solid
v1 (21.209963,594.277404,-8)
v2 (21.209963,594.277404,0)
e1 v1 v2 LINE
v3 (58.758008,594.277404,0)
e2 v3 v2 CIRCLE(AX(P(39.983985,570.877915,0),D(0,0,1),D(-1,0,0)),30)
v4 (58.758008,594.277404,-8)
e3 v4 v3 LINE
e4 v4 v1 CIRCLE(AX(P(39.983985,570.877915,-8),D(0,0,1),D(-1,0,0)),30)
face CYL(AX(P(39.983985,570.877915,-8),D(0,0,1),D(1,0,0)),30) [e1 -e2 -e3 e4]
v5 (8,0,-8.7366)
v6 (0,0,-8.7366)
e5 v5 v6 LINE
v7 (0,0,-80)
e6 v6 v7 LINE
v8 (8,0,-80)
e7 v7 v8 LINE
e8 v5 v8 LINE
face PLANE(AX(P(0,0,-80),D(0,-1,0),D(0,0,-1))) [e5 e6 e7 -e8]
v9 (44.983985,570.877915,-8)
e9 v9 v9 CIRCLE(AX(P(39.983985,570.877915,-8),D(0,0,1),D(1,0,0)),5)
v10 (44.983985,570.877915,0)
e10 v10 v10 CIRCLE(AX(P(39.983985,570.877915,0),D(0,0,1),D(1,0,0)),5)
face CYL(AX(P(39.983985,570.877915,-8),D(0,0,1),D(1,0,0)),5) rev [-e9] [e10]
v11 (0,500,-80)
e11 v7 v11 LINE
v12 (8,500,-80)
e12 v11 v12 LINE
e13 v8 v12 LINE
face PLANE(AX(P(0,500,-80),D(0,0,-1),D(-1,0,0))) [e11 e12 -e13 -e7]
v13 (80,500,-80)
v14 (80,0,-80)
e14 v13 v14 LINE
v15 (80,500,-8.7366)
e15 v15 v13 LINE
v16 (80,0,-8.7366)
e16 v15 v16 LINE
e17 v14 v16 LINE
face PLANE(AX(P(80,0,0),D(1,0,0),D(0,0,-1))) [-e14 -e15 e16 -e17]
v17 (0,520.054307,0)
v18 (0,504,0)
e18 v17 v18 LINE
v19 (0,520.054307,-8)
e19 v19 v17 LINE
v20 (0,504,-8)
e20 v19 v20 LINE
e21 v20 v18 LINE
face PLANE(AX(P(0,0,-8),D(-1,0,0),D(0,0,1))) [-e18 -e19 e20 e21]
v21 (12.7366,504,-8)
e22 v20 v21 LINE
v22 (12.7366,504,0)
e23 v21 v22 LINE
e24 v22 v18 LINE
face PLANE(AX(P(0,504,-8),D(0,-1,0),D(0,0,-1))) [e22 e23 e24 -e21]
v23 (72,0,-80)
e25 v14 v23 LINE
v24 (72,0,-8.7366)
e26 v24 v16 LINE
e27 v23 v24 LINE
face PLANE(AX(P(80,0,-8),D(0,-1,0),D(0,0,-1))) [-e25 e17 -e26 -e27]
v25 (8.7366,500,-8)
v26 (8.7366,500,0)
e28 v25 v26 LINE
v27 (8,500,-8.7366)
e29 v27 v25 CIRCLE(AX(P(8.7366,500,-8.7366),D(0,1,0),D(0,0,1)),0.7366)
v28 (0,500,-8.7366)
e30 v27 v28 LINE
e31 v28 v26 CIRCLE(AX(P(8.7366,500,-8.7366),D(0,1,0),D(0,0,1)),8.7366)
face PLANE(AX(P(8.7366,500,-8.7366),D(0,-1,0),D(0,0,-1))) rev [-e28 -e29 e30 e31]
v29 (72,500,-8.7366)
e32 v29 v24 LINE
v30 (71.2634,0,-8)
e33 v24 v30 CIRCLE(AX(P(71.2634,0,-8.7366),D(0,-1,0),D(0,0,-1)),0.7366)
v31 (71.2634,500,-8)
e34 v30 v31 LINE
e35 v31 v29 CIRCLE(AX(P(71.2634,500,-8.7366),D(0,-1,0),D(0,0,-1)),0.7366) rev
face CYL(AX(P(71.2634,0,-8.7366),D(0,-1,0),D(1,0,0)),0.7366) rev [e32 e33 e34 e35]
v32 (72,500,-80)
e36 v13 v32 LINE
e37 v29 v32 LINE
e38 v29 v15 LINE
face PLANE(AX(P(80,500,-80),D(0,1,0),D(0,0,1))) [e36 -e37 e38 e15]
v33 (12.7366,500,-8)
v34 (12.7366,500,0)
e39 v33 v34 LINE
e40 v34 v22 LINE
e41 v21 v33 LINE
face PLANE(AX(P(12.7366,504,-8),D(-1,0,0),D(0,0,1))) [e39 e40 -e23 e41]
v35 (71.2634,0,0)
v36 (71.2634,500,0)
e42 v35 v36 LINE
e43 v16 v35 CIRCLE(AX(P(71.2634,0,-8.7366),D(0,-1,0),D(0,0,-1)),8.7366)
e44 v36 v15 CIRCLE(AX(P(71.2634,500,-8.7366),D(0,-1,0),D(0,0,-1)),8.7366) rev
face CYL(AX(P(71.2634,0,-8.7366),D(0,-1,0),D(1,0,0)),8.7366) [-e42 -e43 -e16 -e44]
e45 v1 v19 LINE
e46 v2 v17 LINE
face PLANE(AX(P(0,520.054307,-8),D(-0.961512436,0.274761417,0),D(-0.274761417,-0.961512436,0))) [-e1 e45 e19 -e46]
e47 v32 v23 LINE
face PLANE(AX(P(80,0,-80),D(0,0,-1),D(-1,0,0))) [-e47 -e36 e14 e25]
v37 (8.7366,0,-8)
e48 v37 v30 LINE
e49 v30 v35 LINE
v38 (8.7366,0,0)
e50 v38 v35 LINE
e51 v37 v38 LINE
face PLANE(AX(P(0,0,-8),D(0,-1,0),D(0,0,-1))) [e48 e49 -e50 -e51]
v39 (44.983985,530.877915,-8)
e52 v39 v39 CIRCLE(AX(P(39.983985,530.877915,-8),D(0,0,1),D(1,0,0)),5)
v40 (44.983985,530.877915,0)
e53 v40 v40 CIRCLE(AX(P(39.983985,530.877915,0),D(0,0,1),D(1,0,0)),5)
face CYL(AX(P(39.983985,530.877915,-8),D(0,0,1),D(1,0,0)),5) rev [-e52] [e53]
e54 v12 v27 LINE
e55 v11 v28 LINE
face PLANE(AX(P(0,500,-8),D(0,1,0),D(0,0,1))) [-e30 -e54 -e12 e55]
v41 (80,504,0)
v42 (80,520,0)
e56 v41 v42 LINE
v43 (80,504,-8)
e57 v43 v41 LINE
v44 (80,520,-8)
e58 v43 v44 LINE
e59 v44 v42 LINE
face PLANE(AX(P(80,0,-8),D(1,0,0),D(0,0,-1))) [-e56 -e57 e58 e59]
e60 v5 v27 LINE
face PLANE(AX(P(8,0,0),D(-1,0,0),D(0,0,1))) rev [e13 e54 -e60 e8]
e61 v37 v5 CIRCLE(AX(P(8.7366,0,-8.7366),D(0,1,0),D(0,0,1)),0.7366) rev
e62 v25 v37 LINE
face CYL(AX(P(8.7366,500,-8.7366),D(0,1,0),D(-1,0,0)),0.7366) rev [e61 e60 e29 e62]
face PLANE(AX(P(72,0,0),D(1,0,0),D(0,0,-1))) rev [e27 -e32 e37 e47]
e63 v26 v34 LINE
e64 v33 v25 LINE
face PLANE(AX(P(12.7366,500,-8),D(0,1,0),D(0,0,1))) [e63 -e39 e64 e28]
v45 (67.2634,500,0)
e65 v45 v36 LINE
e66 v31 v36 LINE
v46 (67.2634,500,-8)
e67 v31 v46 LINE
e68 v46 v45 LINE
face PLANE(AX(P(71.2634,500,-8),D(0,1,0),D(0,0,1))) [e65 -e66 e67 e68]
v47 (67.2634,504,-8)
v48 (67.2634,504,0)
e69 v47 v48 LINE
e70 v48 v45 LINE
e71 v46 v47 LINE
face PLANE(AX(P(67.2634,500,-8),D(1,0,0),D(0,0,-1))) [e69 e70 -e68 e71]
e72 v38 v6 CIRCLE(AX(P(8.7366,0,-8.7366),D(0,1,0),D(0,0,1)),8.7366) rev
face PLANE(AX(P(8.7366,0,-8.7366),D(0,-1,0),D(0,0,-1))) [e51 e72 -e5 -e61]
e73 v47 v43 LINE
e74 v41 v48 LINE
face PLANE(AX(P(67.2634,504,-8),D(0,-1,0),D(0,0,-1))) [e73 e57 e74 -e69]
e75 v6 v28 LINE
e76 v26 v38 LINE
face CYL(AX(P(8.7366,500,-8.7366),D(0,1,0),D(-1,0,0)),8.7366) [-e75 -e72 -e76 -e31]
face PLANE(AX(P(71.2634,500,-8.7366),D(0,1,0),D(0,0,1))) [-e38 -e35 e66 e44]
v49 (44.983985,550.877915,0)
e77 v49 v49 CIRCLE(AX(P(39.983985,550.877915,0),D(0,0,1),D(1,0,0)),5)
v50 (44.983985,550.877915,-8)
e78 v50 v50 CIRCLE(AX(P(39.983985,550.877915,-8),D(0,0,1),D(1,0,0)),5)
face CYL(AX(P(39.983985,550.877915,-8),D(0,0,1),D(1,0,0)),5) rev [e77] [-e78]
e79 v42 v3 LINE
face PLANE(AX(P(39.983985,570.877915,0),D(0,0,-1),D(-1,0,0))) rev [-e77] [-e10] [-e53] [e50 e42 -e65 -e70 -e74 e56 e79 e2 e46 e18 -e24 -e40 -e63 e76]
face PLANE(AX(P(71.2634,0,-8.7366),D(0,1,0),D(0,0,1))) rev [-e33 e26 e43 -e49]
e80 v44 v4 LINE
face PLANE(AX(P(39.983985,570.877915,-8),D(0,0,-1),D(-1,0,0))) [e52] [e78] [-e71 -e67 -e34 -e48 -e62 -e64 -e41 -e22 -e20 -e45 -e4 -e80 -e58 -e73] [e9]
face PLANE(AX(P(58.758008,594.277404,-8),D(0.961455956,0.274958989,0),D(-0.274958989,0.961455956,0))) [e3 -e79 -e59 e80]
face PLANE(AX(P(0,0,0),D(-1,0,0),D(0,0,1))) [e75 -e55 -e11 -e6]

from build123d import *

# Parameters (mm, degrees)
SKETCH_1_R                        = 5
SM_BASE_FLANGE_2_DEPTH            = 8
SM_EDGE_FLANGE_4_STRIP_W          = 33.4732
SM_EDGE_FLANGE_4_STRIP_H          = 8
SM_EDGE_FLANGE_4_STRIP_CUT_DEPTH  = 500
SM_EDGE_FLANGE_4_RELIEF_W         = 37.4732
SM_EDGE_FLANGE_4_RELIEF_H         = 4
SM_EDGE_FLANGE_4_RELIEF_CUT_DEPTH = 8
SM_EDGE_FLANGE_4_DEPTH            = 500
SM_EDGE_FLANGE_8_STRIP_W          = 33.4732
SM_EDGE_FLANGE_8_STRIP_H          = 8
SM_EDGE_FLANGE_8_STRIP_CUT_DEPTH  = 500
SM_EDGE_FLANGE_8_RELIEF_W         = 37.4732
SM_EDGE_FLANGE_8_RELIEF_H         = 4
SM_EDGE_FLANGE_8_RELIEF_CUT_DEPTH = 8
SM_EDGE_FLANGE_8_DEPTH            = 500


# Sheet-metal steps are written as plain solids
with BuildPart() as part:
    # 草图1 → 基体-法兰2 (new body)
    with BuildSketch(Plane.XY):
        with BuildLine():
            Line((0, 0), (80, 0))
            Line((80, 0), (80, 520))
            Line((80, 520), (58.758007847, 594.277403974))
            ThreePointArc((58.758007847, 594.277403974), (39.983985428, 600.877915043), (21.209963009, 594.277403974))
            Line((21.209963009, 594.277403974), (0, 520.054307268))
            Line((0, 520.054307268), (0, 0))
        make_face()
        with Locations((39.983985428, 570.877915043)):
            Circle(SKETCH_1_R, mode=Mode.SUBTRACT)
        with Locations((39.983985428, 550.877915043)):
            Circle(SKETCH_1_R, mode=Mode.SUBTRACT)
        with Locations((39.983985428, 530.877915043)):
            Circle(SKETCH_1_R, mode=Mode.SUBTRACT)
    extrude(amount=-SM_BASE_FLANGE_2_DEPTH)

    # 边线-法兰4 strip (across the edge) → 边线-法兰4 strip cut (cut)
    with BuildSketch(Plane(origin=(0, 0, -8), x_dir=(1, 0, 0), z_dir=(0, 1, 0))):
        with Locations((-8, -4)):
            Rectangle(SM_EDGE_FLANGE_4_STRIP_W, SM_EDGE_FLANGE_4_STRIP_H)
    extrude(amount=SM_EDGE_FLANGE_4_STRIP_CUT_DEPTH, mode=Mode.SUBTRACT)

    # 边线-法兰4 relief (on the sheet) → 边线-法兰4 relief cut (cut)
    with BuildSketch(Plane(origin=(8.7366, 0, -8), x_dir=(1, 0, 0), z_dir=(0, 0, -1))):
        with Locations((-14.7366, -502)):
            Rectangle(SM_EDGE_FLANGE_4_RELIEF_W, SM_EDGE_FLANGE_4_RELIEF_H)
    extrude(amount=-SM_EDGE_FLANGE_4_RELIEF_CUT_DEPTH, mode=Mode.SUBTRACT)

    # 边线-法兰4 section (across the edge) → 边线-法兰4 (add)
    with BuildSketch(Plane(origin=(0, 0, -8), x_dir=(1, 0, 0), z_dir=(0, 1, 0))):
        with BuildLine():
            Line((0, 0.7366), (0, 72))
            Line((0, 72), (8, 72))
            Line((8, 72), (8, 0.7366))
            ThreePointArc((8, 0.7366), (8.215745145, 0.215745145), (8.7366, 0))
            Line((8.7366, 0), (8.7366, -8))
            ThreePointArc((8.7366, -8), (2.558890895, -5.441109105), (0, 0.7366))
        make_face()
    extrude(amount=SM_EDGE_FLANGE_4_DEPTH)

    # 边线-法兰8 strip (across the edge) → 边线-法兰8 strip cut (cut)
    with BuildSketch(Plane(origin=(80, 500, -8), x_dir=(-1, 0, 0), z_dir=(0, -1, 0))):
        with Locations((-8, -4)):
            Rectangle(SM_EDGE_FLANGE_8_STRIP_W, SM_EDGE_FLANGE_8_STRIP_H)
    extrude(amount=SM_EDGE_FLANGE_8_STRIP_CUT_DEPTH, mode=Mode.SUBTRACT)

    # 边线-法兰8 relief (on the sheet) → 边线-法兰8 relief cut (cut)
    with BuildSketch(Plane(origin=(71.2634, 500, -8), x_dir=(-1, 0, 0), z_dir=(0, 0, -1))):
        with Locations((-14.7366, 2)):
            Rectangle(SM_EDGE_FLANGE_8_RELIEF_W, SM_EDGE_FLANGE_8_RELIEF_H)
    extrude(amount=-SM_EDGE_FLANGE_8_RELIEF_CUT_DEPTH, mode=Mode.SUBTRACT)

    # 边线-法兰8 section (across the edge) → 边线-法兰8 (add)
    with BuildSketch(Plane(origin=(80, 500, -8), x_dir=(-1, 0, 0), z_dir=(0, -1, 0))):
        with BuildLine():
            Line((0, 0.7366), (0, 72))
            Line((0, 72), (8, 72))
            Line((8, 72), (8, 0.7366))
            ThreePointArc((8, 0.7366), (8.215745145, 0.215745145), (8.7366, 0))
            Line((8.7366, 0), (8.7366, -8))
            ThreePointArc((8.7366, -8), (2.558890895, -5.441109105), (0, 0.7366))
        make_face()
    extrude(amount=SM_EDGE_FLANGE_8_DEPTH)


solid = part.part
